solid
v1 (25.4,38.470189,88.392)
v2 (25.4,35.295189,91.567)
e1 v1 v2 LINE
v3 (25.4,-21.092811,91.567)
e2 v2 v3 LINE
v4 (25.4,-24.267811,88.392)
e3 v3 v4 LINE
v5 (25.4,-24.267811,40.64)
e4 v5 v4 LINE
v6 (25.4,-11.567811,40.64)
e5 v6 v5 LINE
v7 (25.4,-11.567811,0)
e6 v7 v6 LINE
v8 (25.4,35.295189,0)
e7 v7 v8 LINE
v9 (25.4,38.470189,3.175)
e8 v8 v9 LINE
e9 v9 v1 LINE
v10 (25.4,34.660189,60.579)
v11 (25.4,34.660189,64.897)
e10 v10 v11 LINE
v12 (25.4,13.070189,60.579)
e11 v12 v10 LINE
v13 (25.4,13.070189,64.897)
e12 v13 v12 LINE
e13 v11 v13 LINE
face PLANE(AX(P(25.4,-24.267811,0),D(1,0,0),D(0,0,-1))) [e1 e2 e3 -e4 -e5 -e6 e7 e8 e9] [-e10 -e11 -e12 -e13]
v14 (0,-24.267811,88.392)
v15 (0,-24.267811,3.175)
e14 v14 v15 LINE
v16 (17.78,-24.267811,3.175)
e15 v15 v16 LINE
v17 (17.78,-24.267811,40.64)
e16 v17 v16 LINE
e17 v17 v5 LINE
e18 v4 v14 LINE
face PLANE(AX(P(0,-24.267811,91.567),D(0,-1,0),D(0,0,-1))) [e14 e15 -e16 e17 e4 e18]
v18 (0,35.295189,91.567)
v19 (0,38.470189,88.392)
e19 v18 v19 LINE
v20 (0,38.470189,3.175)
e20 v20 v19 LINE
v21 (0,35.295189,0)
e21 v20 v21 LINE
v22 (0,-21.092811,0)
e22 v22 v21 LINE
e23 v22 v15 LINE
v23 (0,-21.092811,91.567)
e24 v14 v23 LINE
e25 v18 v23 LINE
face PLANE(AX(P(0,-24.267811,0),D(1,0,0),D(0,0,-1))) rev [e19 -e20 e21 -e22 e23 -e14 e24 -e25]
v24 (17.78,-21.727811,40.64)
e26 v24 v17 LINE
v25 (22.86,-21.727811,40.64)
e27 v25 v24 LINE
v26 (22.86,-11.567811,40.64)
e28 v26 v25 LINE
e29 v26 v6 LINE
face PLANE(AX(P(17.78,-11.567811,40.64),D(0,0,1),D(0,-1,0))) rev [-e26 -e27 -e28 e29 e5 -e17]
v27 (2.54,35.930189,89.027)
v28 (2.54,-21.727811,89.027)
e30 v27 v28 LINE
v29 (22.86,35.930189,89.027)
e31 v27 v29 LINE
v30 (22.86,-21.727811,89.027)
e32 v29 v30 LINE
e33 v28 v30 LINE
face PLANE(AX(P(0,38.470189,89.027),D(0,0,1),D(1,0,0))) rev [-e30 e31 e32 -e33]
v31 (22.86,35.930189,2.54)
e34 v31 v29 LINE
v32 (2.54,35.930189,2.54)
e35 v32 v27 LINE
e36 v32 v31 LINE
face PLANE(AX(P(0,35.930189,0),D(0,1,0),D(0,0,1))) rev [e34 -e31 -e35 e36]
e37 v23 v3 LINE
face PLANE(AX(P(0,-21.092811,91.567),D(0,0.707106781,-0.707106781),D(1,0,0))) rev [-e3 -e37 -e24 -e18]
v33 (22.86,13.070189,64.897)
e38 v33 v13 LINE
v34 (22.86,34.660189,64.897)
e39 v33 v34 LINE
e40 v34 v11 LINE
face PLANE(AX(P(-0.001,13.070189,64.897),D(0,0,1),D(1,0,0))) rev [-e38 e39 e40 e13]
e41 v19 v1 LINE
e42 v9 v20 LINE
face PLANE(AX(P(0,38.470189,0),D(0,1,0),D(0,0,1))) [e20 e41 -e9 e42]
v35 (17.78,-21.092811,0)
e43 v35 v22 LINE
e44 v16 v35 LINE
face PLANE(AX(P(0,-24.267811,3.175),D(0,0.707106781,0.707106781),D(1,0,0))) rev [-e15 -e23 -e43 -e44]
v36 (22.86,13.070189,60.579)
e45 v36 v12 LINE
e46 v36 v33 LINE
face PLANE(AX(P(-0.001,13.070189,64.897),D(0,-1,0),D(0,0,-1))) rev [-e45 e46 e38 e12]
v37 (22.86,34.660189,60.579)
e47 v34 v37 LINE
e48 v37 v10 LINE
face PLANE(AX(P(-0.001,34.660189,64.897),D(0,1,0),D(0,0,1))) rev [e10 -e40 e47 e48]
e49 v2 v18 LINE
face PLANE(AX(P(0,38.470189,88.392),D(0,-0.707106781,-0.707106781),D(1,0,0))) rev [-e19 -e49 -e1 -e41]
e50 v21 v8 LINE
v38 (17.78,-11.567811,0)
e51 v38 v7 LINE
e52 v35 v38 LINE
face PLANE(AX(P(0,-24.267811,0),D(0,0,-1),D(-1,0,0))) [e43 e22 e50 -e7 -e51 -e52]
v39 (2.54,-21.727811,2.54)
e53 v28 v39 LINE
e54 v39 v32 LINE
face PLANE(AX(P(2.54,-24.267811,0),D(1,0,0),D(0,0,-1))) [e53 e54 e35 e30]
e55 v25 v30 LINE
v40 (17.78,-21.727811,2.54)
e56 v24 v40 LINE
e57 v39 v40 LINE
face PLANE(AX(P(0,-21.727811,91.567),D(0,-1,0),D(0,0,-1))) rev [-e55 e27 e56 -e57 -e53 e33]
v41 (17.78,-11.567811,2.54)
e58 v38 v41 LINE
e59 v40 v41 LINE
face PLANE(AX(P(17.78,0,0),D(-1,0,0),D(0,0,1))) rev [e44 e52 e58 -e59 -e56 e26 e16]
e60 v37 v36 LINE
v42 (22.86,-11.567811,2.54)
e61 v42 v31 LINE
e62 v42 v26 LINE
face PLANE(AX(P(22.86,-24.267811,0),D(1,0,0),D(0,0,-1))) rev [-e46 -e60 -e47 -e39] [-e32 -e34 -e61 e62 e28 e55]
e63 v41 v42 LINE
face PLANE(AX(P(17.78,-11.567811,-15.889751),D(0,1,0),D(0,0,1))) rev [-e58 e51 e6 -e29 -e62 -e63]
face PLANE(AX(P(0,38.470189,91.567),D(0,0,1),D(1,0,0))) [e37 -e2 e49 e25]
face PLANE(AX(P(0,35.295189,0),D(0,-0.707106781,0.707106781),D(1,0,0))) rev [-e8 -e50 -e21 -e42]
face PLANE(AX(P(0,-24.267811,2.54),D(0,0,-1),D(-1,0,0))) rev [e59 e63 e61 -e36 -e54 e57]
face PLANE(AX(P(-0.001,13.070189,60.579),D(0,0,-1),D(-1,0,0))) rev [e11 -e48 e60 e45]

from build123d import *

# Parameters (mm, degrees)
THICKEN2_OUTLINE_W   = 62.738
THICKEN2_OUTLINE_H   = 91.567
THICKEN2_OUTLINE_W_2 = 57.658
THICKEN2_OUTLINE_H_2 = 86.487
THICKEN2_DEPTH       = 25.4
THICKEN2_2_OUTLINE_W = 57.658
THICKEN2_2_OUTLINE_H = 86.487
THICKEN2_2_DEPTH     = 2.54
THICKEN2_START       = 22.86
THICKEN2_3_OUTLINE_W = 57.658
THICKEN2_3_OUTLINE_H = 86.487
THICKEN2_3_DEPTH     = 2.54
CHAMFER2_SIZE        = 3.175
SKETCH10_W           = 56.529750703
SKETCH10_H           = 12.7
CUT_EXTRUDE2_DEPTH   = 7.62
CUT_EXTRUDE3_REACH   = 104.516
SKETCH11_W           = 4.318
SKETCH11_H           = 21.59


# Read off the part's stored shape, not the designer's step: Thicken2
with BuildPart() as part:
    # Thicken2 outline → Thicken2 (new body)
    with BuildSketch(Plane.YZ):
        with Locations((7.10118863, 45.7835)):
            Rectangle(THICKEN2_OUTLINE_W, THICKEN2_OUTLINE_H)
        with Locations((7.10118863, 45.7835)):
            Rectangle(THICKEN2_OUTLINE_W_2, THICKEN2_OUTLINE_H_2, mode=Mode.SUBTRACT)
    extrude(amount=THICKEN2_DEPTH)

    # Thicken2 2 outline → Thicken2 2 (add)
    with BuildSketch(Plane.YZ):
        with Locations((7.10118863, 45.7835)):
            Rectangle(THICKEN2_2_OUTLINE_W, THICKEN2_2_OUTLINE_H)
    extrude(amount=THICKEN2_2_DEPTH)

    # Thicken2 3 outline → Thicken2 3 (add)
    with BuildSketch(Plane.YZ.offset(THICKEN2_START)):
        with Locations((7.10118863, 45.7835)):
            Rectangle(THICKEN2_3_OUTLINE_W, THICKEN2_3_OUTLINE_H)
    extrude(amount=THICKEN2_3_DEPTH)

    # Chamfer2
    chamfer2_edges = [part.edges().sort_by_distance(p)[0] for p in [
        (12.7, 38.47018863, 0),
        (12.7, 38.47018863, 91.567),
        (12.7, -24.26781137, 0),
        (12.7, -24.26781137, 91.567),
    ]]
    chamfer(chamfer2_edges, length=CHAMFER2_SIZE)

    # Sketch10 → Cut-Extrude2 (cut)
    with BuildSketch(Plane(origin=(25.4, 0, 0), x_dir=(0, 0, -1), z_dir=(1, 0, 0))):
        with Locations((-12.375124648, -17.91781137)):
            Rectangle(SKETCH10_W, SKETCH10_H)
    extrude(amount=-CUT_EXTRUDE2_DEPTH, mode=Mode.SUBTRACT)

    # Sketch11 → Cut-Extrude3 (cut, up to next)
    with BuildSketch(Plane(origin=(25.4, 0, 0), x_dir=(0, 0, -1), z_dir=(1, 0, 0)), mode=Mode.PRIVATE) as cut_extrude3_sk1:
        with Locations((-62.738, 23.86518863)):
            Rectangle(SKETCH11_W, SKETCH11_H)
    cut_extrude3_tool1 = extrude(cut_extrude3_sk1.sketch, amount=-CUT_EXTRUDE3_REACH, mode=Mode.PRIVATE) & part.part
    add(cut_extrude3_tool1.solids().sort_by_distance((25.4, 23.865189, 62.738))[0], mode=Mode.SUBTRACT)


solid = part.part
